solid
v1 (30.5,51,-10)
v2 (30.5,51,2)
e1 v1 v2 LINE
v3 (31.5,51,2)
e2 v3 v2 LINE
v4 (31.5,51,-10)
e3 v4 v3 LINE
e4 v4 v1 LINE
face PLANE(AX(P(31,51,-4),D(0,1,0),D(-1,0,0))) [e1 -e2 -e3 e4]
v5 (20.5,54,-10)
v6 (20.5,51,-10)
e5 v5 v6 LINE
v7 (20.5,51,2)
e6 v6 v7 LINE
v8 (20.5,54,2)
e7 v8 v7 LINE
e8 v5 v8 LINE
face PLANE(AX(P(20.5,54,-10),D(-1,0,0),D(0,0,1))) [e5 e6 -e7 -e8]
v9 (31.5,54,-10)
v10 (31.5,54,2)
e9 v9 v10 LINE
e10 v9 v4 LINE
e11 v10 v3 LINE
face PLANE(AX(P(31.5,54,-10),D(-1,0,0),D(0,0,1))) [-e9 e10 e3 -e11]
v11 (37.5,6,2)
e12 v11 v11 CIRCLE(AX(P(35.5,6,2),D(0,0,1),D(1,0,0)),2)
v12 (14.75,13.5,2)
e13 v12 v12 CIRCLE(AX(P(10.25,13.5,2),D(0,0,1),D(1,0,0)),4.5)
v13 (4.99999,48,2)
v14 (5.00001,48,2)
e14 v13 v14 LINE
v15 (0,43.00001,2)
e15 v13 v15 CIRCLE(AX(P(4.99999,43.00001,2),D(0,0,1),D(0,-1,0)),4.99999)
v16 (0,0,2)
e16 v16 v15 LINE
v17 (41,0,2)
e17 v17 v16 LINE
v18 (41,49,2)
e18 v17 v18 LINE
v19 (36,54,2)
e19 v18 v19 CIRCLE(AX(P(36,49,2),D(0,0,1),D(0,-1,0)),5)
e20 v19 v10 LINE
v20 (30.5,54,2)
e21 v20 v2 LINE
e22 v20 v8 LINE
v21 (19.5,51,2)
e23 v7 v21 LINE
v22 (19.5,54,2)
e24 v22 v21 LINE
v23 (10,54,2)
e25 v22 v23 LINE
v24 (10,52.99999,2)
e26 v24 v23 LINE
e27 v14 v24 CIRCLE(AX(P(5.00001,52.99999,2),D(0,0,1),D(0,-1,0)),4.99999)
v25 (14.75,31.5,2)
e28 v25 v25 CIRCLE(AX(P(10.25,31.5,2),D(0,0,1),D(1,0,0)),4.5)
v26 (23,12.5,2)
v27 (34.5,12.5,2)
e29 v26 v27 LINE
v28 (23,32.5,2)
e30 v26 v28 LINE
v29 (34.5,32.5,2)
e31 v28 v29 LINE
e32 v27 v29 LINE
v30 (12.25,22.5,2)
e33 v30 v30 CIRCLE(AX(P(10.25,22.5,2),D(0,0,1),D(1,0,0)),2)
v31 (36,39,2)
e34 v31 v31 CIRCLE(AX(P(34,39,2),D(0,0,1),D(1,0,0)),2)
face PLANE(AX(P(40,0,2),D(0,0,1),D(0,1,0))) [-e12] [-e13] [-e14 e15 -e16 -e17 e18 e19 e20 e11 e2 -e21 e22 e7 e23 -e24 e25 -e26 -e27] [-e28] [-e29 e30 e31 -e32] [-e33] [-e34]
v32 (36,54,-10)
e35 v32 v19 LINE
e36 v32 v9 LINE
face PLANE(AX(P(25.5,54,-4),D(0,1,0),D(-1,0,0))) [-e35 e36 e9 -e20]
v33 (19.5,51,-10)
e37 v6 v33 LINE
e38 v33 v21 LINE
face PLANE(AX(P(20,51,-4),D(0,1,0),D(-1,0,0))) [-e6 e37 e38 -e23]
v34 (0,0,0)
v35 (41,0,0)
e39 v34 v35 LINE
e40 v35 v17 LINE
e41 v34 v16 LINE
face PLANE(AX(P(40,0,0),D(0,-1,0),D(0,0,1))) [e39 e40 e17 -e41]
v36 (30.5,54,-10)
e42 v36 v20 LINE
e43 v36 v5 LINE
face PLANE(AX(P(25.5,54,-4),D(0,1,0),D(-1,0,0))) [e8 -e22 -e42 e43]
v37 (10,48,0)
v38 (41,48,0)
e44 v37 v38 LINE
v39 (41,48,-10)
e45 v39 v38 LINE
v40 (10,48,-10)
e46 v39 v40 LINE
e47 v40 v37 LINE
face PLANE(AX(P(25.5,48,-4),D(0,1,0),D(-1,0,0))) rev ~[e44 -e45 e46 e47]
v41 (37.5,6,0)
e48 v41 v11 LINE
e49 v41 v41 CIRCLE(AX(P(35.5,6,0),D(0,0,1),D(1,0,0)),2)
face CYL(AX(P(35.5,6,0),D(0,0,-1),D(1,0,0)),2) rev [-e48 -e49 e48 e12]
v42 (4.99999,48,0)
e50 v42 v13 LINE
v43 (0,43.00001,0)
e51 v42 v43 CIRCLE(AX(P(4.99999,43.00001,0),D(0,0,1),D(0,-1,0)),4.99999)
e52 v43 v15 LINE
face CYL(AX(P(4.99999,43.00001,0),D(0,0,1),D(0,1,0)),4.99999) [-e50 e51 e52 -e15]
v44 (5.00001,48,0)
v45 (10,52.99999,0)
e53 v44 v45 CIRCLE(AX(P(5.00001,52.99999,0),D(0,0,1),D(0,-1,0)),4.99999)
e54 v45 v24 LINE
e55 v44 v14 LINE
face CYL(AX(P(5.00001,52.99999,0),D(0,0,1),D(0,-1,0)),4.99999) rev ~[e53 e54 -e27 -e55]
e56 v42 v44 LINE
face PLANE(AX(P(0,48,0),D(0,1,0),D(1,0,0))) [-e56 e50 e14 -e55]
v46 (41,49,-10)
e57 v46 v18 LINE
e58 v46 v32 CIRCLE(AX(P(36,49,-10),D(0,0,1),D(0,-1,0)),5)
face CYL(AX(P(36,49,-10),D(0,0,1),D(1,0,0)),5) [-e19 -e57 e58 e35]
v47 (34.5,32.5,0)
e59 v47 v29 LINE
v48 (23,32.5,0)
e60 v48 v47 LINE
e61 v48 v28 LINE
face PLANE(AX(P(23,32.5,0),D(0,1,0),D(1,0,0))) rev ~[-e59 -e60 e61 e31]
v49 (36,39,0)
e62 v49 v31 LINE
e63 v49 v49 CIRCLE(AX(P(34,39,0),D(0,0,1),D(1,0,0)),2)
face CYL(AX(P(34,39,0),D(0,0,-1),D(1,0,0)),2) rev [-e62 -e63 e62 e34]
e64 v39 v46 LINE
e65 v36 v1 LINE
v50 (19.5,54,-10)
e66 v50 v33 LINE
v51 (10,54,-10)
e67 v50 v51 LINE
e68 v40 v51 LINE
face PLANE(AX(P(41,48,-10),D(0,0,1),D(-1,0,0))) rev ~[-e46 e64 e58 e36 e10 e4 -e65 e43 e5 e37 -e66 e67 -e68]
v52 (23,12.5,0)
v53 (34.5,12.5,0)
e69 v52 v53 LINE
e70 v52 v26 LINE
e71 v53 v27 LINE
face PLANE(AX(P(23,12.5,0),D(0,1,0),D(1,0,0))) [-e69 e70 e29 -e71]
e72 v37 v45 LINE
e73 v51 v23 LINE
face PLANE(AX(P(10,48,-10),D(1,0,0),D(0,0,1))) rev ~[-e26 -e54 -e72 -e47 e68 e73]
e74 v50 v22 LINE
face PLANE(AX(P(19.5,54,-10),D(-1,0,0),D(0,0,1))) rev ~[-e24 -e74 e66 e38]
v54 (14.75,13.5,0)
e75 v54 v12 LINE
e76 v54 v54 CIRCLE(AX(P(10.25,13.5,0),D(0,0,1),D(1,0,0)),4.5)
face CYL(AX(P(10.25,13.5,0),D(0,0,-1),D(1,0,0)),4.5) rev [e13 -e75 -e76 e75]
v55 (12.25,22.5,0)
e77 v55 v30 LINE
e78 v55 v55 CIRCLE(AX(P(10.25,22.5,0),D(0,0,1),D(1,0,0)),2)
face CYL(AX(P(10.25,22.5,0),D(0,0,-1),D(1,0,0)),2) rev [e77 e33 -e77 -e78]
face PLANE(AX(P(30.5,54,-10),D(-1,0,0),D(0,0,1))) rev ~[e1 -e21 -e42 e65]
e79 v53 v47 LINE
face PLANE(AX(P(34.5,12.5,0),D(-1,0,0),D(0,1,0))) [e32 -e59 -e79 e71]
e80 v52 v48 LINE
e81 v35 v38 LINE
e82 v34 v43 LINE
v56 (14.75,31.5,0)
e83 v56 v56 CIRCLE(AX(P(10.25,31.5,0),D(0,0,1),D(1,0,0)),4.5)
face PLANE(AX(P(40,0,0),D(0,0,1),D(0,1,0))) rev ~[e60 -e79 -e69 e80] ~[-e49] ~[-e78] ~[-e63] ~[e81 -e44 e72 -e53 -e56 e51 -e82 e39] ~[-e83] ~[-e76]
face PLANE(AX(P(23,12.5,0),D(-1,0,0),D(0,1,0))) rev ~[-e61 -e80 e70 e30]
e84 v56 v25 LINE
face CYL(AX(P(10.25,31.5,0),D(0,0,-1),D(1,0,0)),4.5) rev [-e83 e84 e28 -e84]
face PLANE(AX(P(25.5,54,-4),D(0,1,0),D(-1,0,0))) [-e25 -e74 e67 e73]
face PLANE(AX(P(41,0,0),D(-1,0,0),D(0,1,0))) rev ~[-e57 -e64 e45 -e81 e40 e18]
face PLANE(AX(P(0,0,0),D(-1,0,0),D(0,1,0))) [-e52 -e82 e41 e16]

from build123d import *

# Parameters (mm, degrees)
F0_W     = 40
F0_H     = 48
F0_R     = 4.5
F0_R_2   = 2
F0_W_2   = 11.5
F0_H_2   = 20
F1_DEPTH = 2
F2_W     = 31
F2_H     = 12
F3_DEPTH = 6
F4_W     = 1
F4_H     = 12
F5_DEPTH = 3
F6_DEPTH = 1
F7_R     = 4.99999
F8_R     = 5


# Not quite as in the source:
# - a fillet or chamfer is up to 0.001 mm smaller than in the source, because OpenCascade refuses the exact size


with BuildPart() as f1:
    # F0 (on Top) → F1 (new body)
    with BuildSketch(Plane.XY):
        with Locations((20, 24)):
            Rectangle(F0_W, F0_H)
        with Locations((10.25, 13.5)):
            Circle(F0_R, mode=Mode.SUBTRACT)
        with Locations((10.25, 22.5)):
            Circle(F0_R_2, mode=Mode.SUBTRACT)
        with Locations((35.5, 6)):
            Circle(F0_R_2, mode=Mode.SUBTRACT)
        with Locations((28.75, 22.5)):
            Rectangle(F0_W_2, F0_H_2, mode=Mode.SUBTRACT)
        with Locations((10.25, 31.5)):
            Circle(F0_R, mode=Mode.SUBTRACT)
        with Locations((34, 39)):
            Circle(F0_R_2, mode=Mode.SUBTRACT)
    extrude(amount=F1_DEPTH)

    # F2 (on face) → F3 (join)
    with BuildSketch(Plane(origin=(0, 48, 0), x_dir=(-1, 0, 0), z_dir=(0, 1, 0))):
        with Locations((-25.5, -4)):
            Rectangle(F2_W, F2_H)
    extrude(amount=F3_DEPTH)

    # F4 (on face) → F5 (cut)
    with BuildSketch(Plane(origin=(0, 54, 0), x_dir=(-1, 0, 0), z_dir=(0, 1, 0))):
        with Locations((-20, -4)):
            Rectangle(F4_W, F4_H)
        with Locations((-31, -4)):
            Rectangle(F4_W, F4_H)
    extrude(amount=-F5_DEPTH, mode=Mode.SUBTRACT)

    # F6 (add): a face of the model
    f6_faces = [f1.faces().sort_by_distance(p)[0] for p in [
        (40, 24, 1),
    ]]
    extrude(f6_faces, amount=F6_DEPTH)

    # F7 (radius 5 in the source; OpenCascade refuses exactly that, so slightly less here)
    f7_edges = [f1.edges().sort_by_distance(p)[0] for p in [
        (10, 48, 1),
        (0, 48, 1),
    ]]
    fillet(f7_edges, radius=F7_R)

    # F8
    f8_edges = [f1.edges().sort_by_distance(p)[0] for p in [
        (41, 54, -4),
    ]]
    fillet(f8_edges, radius=F8_R)


solid = f1.part
